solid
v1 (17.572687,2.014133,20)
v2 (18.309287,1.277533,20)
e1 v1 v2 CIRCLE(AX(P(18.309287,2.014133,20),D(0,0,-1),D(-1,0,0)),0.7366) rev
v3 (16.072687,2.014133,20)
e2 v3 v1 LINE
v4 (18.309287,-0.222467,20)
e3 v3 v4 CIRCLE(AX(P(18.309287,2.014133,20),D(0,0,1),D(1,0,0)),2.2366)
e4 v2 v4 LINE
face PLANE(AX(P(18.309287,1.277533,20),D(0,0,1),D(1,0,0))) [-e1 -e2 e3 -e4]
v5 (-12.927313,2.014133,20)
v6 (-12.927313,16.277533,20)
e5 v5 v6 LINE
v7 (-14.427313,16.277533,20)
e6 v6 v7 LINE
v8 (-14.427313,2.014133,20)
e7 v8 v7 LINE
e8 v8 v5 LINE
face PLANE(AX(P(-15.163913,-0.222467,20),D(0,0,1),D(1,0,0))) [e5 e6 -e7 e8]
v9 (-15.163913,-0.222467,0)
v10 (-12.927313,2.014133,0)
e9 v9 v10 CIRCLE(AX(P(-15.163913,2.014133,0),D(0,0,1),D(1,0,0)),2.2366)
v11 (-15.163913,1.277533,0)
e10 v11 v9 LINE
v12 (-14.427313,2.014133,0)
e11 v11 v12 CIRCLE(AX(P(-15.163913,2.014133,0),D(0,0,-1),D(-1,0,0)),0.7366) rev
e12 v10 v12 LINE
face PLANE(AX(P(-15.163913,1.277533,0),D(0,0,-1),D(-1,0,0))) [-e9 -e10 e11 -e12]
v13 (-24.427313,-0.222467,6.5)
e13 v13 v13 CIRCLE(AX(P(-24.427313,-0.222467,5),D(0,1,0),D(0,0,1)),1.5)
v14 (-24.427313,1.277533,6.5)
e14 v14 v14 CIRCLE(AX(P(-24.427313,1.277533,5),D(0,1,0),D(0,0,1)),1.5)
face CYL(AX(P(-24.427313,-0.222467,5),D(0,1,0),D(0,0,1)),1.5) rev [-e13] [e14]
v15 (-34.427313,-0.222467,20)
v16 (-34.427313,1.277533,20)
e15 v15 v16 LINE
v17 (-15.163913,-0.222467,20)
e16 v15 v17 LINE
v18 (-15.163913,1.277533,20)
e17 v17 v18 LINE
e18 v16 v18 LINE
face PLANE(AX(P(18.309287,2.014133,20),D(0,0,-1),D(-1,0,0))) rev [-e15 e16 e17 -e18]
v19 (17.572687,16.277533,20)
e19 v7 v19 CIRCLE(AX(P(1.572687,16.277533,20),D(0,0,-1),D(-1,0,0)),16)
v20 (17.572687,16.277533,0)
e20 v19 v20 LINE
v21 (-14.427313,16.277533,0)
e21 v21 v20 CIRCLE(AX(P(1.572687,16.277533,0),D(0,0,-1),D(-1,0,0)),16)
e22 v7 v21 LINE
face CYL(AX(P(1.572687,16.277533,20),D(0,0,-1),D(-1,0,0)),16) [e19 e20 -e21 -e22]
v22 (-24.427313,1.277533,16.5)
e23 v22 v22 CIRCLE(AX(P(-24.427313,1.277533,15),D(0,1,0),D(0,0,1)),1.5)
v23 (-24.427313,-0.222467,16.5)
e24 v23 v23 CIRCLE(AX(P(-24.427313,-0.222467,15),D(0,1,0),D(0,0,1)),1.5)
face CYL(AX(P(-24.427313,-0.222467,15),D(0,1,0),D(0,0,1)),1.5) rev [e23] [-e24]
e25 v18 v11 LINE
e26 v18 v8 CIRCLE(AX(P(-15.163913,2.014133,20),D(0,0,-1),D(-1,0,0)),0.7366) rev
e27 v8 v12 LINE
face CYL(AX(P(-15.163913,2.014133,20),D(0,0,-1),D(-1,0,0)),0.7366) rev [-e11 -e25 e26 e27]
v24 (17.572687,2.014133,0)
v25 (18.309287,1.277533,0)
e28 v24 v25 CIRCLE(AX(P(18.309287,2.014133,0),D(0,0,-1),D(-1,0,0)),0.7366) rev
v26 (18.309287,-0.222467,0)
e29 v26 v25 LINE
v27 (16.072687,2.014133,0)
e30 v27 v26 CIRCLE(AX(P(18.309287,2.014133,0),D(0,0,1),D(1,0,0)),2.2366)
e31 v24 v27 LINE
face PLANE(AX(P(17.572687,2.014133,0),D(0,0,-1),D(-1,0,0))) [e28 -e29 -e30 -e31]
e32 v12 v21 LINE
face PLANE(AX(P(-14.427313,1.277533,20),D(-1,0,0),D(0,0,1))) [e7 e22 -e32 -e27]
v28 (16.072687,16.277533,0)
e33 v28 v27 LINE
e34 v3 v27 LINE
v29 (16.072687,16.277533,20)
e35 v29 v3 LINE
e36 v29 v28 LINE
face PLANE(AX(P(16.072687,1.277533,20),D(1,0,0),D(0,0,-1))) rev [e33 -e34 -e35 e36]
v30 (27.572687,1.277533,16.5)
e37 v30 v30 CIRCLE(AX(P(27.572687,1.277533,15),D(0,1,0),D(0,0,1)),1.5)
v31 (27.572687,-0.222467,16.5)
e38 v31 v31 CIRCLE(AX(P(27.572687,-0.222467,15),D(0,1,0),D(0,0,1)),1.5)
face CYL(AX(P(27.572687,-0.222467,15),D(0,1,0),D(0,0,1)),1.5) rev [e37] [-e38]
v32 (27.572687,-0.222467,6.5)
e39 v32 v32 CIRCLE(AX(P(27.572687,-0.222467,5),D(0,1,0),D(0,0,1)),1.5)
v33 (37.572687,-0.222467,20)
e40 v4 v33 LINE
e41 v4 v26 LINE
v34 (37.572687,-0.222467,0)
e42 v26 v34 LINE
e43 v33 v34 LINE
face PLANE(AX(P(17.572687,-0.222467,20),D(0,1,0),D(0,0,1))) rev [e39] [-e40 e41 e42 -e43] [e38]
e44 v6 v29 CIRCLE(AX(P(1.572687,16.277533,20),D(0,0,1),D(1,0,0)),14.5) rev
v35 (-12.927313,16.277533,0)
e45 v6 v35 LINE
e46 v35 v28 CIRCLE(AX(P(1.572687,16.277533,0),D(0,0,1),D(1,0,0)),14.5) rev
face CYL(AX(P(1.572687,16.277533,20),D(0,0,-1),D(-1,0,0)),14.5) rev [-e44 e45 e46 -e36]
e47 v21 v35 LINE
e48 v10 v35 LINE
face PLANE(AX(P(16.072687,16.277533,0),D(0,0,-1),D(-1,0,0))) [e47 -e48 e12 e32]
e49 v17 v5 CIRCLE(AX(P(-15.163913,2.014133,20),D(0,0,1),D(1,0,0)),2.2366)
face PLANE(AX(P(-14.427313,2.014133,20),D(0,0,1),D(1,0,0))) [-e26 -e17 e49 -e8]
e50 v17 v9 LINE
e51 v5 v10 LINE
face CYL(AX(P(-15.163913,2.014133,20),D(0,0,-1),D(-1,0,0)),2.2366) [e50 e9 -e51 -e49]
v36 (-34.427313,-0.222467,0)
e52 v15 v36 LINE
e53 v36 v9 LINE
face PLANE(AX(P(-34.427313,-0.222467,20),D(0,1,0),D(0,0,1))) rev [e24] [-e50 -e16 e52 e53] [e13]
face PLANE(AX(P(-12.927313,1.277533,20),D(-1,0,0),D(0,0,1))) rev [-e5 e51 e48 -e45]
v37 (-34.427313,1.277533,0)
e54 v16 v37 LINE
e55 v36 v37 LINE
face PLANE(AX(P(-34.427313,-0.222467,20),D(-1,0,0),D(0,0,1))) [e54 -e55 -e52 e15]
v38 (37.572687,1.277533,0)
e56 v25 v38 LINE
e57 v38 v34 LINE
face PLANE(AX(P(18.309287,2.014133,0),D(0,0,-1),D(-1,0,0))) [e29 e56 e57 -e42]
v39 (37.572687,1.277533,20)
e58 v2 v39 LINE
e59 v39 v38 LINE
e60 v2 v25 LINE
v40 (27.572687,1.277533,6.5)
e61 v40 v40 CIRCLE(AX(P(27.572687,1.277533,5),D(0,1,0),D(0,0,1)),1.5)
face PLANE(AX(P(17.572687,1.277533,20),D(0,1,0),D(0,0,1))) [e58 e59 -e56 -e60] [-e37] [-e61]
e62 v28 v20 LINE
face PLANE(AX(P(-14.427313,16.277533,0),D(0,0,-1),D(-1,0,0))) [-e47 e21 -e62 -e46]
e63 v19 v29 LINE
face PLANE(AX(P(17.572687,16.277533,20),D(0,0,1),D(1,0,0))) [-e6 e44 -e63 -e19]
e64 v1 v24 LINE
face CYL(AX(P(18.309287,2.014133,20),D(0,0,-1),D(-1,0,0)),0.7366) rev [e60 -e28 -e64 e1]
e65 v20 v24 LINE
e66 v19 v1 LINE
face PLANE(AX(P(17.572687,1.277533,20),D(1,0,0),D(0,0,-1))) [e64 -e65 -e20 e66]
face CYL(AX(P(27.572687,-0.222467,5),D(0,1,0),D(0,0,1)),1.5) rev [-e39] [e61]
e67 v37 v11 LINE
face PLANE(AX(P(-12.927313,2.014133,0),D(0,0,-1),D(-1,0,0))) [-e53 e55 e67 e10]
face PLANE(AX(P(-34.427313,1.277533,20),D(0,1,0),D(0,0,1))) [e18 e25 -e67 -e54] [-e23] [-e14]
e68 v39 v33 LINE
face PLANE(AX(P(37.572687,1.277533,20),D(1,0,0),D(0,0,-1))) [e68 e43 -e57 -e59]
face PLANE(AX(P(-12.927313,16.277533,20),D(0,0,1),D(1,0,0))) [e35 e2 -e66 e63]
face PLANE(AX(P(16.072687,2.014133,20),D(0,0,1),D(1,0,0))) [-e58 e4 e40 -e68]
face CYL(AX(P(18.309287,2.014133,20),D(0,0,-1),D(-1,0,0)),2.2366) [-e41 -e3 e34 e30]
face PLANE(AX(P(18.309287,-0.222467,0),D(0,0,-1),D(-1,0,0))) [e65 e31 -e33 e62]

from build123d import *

# Parameters (mm, degrees)
BASE_FLANGE1_DEPTH = 20
SKETCH2_R          = 1.5
CUT_EXTRUDE1_DEPTH = 1.5
SKETCH4_R          = 1.5
CUT_EXTRUDE2_DEPTH = 1.5


# Sheet-metal steps are written as plain solids
with BuildPart() as part:
    # Sketch1 → Base-Flange1 (new body)
    with BuildSketch(Plane.XY):
        with BuildLine():
            Line((-34.427312775, 1.27753304), (-15.163912775, 1.27753304))
            ThreePointArc((-15.163912775, 1.27753304), (-14.64305792, 1.493278185), (-14.427312775, 2.01413304))
            Line((-14.427312775, 2.01413304), (-14.427312775, 16.27753304))
            ThreePointArc((-14.427312775, 16.27753304), (1.572687225, 32.27753304), (17.572687225, 16.27753304))
            Line((17.572687225, 16.27753304), (17.572687225, 2.01413304))
            ThreePointArc((17.572687225, 2.01413304), (17.78843237, 1.493278185), (18.309287225, 1.27753304))
            Line((18.309287225, 1.27753304), (37.572687225, 1.27753304))
            Line((37.572687225, 1.27753304), (37.572687225, -0.22246696))
            Line((37.572687225, -0.22246696), (18.309287225, -0.22246696))
            ThreePointArc((18.309287225, -0.22246696), (16.727772198, 0.432618013), (16.072687225, 2.01413304))
            Line((16.072687225, 2.01413304), (16.072687225, 16.27753304))
            ThreePointArc((16.072687225, 16.27753304), (1.572687225, 30.77753304), (-12.927312775, 16.27753304))
            Line((-12.927312775, 16.27753304), (-12.927312775, 2.01413304))
            ThreePointArc((-12.927312775, 2.01413304), (-13.582397749, 0.432618013), (-15.163912775, -0.22246696))
            Line((-15.163912775, -0.22246696), (-34.427312775, -0.22246696))
            Line((-34.427312775, -0.22246696), (-34.427312775, 1.27753304))
        make_face()
    extrude(amount=BASE_FLANGE1_DEPTH)

    # Sketch2 → Cut-Extrude1 (cut)
    with BuildSketch(Plane(origin=(0, 1.27753304, 0), x_dir=(1, 0, 0), z_dir=(0, 1, 0))):
        with Locations(Location((-24.427312775, -5, 0), (0, 0, 270))):
            Circle(SKETCH2_R)
        with Locations(Location((-24.427312775, -15, 0), (0, 0, 270))):
            Circle(SKETCH2_R)
    extrude(amount=-CUT_EXTRUDE1_DEPTH, mode=Mode.SUBTRACT)

    # Sketch4 → Cut-Extrude2 (cut)
    with BuildSketch(Plane(origin=(0, 1.27753304, 0), x_dir=(1, 0, 0), z_dir=(0, 1, 0))):
        with Locations(Location((27.572687225, -5, 0), (0, 0, 270))):
            Circle(SKETCH4_R)
        with Locations(Location((27.572687225, -15, 0), (0, 0, 270))):
            Circle(SKETCH4_R)
    extrude(amount=-CUT_EXTRUDE2_DEPTH, mode=Mode.SUBTRACT)


solid = part.part
